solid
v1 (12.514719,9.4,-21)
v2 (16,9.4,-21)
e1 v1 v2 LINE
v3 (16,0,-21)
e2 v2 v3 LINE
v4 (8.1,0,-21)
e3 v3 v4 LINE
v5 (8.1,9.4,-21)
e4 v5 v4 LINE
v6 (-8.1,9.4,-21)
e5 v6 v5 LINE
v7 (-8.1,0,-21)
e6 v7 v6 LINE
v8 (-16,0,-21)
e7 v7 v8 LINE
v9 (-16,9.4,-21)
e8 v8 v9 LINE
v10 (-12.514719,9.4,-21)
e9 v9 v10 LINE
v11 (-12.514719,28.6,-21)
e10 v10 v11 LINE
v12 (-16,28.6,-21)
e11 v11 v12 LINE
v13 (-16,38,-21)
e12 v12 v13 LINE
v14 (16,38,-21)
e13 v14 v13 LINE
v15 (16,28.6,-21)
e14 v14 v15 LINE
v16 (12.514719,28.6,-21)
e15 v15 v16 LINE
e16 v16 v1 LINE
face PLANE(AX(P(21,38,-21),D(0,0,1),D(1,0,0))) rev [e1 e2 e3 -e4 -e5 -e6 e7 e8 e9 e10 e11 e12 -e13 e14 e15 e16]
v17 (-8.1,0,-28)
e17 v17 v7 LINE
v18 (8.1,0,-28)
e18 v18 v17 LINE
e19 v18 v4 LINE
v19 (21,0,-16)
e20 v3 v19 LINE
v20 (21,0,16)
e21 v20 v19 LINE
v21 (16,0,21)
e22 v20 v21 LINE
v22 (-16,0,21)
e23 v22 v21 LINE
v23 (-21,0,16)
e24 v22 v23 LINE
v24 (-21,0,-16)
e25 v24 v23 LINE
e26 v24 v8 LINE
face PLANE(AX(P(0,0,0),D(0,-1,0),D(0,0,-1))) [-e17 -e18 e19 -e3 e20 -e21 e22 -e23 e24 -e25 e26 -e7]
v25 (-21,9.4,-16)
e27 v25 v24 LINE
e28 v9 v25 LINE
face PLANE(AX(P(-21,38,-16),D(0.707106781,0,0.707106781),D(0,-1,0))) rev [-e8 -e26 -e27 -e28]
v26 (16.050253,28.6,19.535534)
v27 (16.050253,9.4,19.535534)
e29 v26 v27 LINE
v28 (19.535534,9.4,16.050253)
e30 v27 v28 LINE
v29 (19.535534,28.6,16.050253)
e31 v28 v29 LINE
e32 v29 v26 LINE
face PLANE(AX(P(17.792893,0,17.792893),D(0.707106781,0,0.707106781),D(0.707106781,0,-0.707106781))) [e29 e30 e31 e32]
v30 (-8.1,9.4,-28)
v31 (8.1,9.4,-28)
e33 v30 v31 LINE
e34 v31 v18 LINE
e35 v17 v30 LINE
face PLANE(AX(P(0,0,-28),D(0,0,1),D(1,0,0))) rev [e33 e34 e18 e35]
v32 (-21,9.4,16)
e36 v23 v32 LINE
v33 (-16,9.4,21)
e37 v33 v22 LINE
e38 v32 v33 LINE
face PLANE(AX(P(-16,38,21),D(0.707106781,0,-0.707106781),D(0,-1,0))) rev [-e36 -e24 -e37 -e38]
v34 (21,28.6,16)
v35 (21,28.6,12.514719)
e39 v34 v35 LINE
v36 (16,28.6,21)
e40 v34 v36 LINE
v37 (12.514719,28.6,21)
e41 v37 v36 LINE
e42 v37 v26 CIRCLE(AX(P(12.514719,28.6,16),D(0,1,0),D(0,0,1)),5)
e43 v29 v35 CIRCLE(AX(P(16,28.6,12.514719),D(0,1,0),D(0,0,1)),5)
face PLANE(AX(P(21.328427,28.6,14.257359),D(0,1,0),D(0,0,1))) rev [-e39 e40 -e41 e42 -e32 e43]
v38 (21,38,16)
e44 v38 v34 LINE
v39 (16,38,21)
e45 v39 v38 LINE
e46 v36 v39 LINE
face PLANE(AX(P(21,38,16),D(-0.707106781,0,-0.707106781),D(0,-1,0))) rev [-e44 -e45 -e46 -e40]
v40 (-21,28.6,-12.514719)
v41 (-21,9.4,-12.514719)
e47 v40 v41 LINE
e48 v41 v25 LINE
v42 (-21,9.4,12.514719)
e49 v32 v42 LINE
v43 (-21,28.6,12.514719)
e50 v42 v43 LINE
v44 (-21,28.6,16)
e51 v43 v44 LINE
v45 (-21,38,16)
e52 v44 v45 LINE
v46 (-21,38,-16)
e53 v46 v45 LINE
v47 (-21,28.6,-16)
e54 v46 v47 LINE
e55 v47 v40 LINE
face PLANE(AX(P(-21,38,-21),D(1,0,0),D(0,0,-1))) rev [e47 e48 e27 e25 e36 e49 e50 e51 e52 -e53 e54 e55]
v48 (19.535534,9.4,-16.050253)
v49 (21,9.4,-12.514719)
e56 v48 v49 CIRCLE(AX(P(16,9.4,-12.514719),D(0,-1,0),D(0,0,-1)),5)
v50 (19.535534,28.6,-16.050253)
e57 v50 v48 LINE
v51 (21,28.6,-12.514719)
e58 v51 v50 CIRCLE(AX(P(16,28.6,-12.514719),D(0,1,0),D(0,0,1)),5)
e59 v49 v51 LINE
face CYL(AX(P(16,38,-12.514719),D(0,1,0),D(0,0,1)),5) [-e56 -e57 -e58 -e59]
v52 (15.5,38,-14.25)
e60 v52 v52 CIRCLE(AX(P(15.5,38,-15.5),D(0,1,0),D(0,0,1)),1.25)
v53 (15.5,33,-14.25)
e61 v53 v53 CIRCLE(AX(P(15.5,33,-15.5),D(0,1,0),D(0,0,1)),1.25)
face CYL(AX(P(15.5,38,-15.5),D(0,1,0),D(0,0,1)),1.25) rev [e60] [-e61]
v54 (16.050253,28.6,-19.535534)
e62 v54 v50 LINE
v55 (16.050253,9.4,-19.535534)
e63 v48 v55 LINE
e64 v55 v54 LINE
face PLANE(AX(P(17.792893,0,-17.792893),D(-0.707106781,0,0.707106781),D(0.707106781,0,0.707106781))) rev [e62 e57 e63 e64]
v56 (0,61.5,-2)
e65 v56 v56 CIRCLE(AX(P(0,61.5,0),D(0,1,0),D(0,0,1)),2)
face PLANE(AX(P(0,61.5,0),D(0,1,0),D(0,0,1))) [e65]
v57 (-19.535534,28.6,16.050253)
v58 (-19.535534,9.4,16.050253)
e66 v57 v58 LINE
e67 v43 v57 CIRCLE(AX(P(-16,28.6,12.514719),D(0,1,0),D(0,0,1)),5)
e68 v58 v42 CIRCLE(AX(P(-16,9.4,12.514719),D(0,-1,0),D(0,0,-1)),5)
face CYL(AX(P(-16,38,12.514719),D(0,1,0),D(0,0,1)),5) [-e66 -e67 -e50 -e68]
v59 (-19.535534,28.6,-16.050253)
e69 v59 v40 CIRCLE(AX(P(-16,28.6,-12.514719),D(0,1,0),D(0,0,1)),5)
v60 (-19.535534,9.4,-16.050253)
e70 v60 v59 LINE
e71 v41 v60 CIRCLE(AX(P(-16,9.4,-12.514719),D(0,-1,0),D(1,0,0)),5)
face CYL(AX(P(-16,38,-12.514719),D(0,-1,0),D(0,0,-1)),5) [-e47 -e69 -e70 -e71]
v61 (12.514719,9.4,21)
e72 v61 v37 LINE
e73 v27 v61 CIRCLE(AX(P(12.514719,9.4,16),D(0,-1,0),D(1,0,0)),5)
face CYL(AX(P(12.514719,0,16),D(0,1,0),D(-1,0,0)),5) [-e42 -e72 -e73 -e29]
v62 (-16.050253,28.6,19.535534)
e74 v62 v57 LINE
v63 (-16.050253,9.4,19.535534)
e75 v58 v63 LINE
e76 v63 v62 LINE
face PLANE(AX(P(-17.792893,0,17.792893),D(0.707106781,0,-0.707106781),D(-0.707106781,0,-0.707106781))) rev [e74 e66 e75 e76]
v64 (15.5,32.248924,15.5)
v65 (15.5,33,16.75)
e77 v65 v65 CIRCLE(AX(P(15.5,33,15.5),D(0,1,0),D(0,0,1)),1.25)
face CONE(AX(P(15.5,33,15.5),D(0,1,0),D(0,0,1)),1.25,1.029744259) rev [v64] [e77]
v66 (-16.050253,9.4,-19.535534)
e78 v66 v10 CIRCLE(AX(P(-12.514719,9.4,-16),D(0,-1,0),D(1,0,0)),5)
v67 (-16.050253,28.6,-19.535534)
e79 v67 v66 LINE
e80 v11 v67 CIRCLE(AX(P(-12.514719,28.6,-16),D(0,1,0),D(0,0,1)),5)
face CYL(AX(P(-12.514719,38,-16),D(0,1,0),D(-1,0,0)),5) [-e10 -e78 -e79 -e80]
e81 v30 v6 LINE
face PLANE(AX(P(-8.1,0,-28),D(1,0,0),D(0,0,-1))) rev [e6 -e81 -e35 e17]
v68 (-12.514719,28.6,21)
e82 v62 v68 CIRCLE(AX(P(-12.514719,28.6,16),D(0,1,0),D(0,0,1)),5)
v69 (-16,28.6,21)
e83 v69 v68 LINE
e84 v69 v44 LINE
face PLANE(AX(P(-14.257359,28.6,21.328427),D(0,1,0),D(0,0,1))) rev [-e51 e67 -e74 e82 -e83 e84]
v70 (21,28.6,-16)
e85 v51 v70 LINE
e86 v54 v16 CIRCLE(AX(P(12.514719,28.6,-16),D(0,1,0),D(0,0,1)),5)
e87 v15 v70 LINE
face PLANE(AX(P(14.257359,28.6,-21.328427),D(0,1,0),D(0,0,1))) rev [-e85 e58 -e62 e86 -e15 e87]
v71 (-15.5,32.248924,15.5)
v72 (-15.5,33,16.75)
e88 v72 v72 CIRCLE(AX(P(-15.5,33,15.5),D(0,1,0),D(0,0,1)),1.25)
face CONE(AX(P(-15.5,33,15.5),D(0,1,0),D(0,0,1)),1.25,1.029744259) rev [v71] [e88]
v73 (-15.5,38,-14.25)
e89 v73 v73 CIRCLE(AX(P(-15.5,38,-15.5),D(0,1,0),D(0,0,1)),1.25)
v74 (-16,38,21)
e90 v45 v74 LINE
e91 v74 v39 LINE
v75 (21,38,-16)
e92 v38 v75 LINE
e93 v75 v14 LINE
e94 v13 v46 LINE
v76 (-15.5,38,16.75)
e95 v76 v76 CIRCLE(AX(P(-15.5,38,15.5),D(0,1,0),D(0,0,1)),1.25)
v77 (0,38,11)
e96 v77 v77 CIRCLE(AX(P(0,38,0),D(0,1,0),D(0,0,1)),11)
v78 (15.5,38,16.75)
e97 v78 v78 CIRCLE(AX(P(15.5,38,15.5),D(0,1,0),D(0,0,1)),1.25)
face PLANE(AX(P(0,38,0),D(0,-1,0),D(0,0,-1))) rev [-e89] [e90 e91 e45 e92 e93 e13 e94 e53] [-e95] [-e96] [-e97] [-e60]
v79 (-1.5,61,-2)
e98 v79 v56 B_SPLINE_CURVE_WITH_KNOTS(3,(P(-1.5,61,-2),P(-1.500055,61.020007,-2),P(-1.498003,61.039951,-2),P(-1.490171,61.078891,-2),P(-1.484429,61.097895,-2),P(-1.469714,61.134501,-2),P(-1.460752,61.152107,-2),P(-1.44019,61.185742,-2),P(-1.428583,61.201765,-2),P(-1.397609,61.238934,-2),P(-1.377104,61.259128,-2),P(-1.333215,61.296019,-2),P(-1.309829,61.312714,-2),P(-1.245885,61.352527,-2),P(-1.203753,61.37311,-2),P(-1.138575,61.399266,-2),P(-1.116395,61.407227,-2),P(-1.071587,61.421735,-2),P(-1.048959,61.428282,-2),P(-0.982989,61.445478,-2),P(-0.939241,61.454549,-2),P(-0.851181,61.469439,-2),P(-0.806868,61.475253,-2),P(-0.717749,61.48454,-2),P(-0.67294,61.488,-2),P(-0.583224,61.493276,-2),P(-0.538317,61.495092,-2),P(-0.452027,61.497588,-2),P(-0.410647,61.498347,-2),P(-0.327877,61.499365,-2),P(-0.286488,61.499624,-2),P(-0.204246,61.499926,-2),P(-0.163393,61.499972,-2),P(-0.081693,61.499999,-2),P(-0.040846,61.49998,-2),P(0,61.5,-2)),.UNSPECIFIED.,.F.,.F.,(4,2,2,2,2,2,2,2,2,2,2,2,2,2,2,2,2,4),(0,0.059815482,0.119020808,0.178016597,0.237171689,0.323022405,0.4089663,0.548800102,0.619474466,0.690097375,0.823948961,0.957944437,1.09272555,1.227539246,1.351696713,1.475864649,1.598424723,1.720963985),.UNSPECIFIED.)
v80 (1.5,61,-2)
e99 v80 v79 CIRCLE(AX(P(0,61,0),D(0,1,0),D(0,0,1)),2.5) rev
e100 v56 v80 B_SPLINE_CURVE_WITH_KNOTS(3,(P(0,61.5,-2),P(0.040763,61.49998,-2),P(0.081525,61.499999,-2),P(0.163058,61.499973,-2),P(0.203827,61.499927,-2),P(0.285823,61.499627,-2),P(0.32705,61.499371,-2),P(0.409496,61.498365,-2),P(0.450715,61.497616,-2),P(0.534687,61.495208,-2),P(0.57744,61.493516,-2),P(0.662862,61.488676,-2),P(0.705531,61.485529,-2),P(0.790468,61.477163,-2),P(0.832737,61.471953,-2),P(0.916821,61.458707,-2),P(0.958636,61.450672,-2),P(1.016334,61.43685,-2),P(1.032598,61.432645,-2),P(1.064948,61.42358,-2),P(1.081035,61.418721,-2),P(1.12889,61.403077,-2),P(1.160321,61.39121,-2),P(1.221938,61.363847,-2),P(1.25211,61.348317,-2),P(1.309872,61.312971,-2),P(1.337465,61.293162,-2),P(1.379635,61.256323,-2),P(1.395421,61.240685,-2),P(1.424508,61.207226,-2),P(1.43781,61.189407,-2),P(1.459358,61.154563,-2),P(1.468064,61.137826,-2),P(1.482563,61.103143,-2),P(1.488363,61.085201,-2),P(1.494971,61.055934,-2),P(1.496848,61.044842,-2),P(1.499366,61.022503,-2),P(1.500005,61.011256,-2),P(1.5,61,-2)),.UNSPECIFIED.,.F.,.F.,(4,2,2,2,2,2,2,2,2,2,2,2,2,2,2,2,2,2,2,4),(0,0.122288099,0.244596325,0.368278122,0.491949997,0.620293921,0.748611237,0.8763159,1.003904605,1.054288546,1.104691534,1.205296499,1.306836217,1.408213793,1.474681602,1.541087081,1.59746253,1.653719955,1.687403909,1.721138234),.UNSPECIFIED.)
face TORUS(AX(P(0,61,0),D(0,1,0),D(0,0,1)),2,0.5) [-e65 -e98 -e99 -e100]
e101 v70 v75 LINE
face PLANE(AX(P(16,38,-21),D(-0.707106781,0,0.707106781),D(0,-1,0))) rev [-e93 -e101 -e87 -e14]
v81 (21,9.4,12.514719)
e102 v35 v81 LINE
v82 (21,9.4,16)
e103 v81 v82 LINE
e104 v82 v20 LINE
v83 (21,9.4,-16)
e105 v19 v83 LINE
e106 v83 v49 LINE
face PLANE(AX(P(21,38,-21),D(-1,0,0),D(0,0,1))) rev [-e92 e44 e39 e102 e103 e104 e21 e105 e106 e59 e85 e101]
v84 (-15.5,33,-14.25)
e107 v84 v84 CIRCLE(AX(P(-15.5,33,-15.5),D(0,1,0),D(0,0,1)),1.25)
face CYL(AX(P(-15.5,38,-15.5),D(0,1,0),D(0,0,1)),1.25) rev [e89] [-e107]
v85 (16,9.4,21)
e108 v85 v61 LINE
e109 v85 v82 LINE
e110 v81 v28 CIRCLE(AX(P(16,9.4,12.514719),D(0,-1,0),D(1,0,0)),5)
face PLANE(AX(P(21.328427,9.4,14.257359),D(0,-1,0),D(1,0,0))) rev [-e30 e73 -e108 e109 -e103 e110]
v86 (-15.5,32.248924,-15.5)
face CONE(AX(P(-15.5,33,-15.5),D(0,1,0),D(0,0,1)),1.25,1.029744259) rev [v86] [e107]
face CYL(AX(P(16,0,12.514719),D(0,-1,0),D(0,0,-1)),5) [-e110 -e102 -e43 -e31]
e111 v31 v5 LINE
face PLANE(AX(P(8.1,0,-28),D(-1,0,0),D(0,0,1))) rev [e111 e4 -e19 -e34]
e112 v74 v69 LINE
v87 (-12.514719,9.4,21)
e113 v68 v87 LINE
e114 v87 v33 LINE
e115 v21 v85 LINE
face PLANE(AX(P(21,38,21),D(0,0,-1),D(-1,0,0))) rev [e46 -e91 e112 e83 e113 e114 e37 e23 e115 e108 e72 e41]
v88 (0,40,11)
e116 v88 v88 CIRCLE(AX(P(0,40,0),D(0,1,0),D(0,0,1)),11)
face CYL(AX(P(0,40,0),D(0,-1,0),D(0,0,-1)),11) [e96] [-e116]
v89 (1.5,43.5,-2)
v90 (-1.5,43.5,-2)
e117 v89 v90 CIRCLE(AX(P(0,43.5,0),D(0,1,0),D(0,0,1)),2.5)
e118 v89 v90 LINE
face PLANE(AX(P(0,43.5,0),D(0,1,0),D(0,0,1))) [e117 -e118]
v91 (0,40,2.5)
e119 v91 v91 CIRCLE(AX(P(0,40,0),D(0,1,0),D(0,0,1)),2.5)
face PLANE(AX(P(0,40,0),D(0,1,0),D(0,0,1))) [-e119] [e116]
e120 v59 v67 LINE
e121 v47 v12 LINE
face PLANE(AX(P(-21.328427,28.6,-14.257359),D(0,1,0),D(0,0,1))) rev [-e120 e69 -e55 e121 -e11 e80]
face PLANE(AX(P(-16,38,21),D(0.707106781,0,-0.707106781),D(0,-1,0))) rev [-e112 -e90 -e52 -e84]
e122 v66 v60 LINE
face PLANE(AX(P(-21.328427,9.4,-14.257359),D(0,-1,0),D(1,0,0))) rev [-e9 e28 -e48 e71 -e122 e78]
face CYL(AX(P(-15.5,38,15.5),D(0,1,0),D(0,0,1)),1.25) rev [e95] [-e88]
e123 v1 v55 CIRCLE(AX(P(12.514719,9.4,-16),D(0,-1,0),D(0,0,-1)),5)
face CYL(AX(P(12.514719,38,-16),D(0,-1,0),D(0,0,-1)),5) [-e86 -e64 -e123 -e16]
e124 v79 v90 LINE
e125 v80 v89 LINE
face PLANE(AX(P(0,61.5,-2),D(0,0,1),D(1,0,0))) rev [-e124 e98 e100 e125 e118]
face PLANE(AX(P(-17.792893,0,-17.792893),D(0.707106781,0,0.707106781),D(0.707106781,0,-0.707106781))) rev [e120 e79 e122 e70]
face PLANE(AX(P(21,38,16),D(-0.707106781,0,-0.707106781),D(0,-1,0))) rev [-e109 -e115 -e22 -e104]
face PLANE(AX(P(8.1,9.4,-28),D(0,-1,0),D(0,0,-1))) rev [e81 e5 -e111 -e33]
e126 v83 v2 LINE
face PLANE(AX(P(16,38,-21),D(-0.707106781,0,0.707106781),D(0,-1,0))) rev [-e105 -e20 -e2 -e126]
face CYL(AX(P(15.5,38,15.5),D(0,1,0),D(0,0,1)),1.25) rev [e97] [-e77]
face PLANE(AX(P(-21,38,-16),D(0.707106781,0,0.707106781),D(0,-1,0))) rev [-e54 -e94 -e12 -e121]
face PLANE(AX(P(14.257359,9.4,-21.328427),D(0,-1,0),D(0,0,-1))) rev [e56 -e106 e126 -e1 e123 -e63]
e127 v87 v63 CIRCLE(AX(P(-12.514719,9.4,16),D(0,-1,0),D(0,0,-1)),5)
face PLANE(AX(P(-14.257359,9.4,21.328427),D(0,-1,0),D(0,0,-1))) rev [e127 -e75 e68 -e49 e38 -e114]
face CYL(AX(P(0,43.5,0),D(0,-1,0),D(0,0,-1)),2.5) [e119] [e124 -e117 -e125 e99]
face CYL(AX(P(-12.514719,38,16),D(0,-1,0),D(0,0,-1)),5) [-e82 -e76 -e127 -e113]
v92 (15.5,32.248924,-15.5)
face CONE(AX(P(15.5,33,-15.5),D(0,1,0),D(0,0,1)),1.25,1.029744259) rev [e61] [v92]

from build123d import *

# Parameters (mm, degrees)
SKETCH1_W             = 42
SKETCH1_H             = 42
BOSS_EXTRUDE1_DEPTH   = 38
SKETCH2_R             = 11
BOSS_EXTRUDE2_DEPTH   = 2
SKETCH3_R             = 2.5
BOSS_EXTRUDE3_DEPTH   = 3.5
BOSS_EXTRUDE4_DEPTH   = 18
M3_TAPPED_HOLE1_D     = 2.5
M3_TAPPED_HOLE1_DEPTH = 5
M3_TAPPED_HOLE1_TIP   = 0.751075774
CHAMFER1_SIZE         = 5
SKETCH11_W            = 10
SKETCH11_H            = 19.2
CUT_EXTRUDE2_DEPTH    = 1
SKETCH12_W            = 10
SKETCH12_H            = 19.2
CUT_EXTRUDE3_DEPTH    = 1
SKETCH13_W            = 10
SKETCH13_H            = 19.2
CUT_EXTRUDE4_DEPTH    = 1
SKETCH14_W            = 10
SKETCH14_H            = 19.2
CUT_EXTRUDE5_DEPTH    = 1
FILLET1_R             = 5
SKETCH15_W            = 16.2
SKETCH15_H            = 9.4
BOSS_EXTRUDE5_DEPTH   = 7
FILLET3_R             = 0.5


with BuildPart() as part:
    # Sketch1 → Boss-Extrude1 (new body)
    with BuildSketch(Plane(origin=(0, 0, 0), x_dir=(1, 0, 0), z_dir=(0, 1, 0))):
        Rectangle(SKETCH1_W, SKETCH1_H)
    extrude(amount=BOSS_EXTRUDE1_DEPTH)

    # Sketch2 → Boss-Extrude2 (add)
    with BuildSketch(Plane(origin=(0, 38, 0), x_dir=(1, 0, 0), z_dir=(0, 1, 0))):
        with Locations(Location((0, 0, 0), (0, 0, 270))):
            Circle(SKETCH2_R)
    extrude(amount=BOSS_EXTRUDE2_DEPTH)

    # Sketch3 → Boss-Extrude3 (add)
    with BuildSketch(Plane(origin=(0, 40, 0), x_dir=(1, 0, 0), z_dir=(0, 1, 0))):
        with Locations(Location((0, 0, 0), (0, 0, 270))):
            Circle(SKETCH3_R)
    extrude(amount=BOSS_EXTRUDE3_DEPTH)

    # Sketch4 → Boss-Extrude4 (add)
    with BuildSketch(Plane(origin=(0, 43.5, 0), x_dir=(1, 0, 0), z_dir=(0, 1, 0))):
        with BuildLine():
            ThreePointArc((-1.5, 2), (-2.371708245, -0.790569415), (0, -2.5))
            Line((0, -2.5), (0, 2))
            Line((0, 2), (-1.5, 2))
        make_face()
        with BuildLine():
            Line((0, 2), (0, -2.5))
            ThreePointArc((0, -2.5), (1.767766953, -1.767766953), (2.5, 0))
            ThreePointArc((2.5, 0), (2.236067977, 1.118033989), (1.5, 2))
            Line((1.5, 2), (0, 2))
        make_face()
    extrude(amount=BOSS_EXTRUDE4_DEPTH)

    # M3 Tapped Hole1
    with Locations(Plane(origin=(0, 38, 0), x_dir=(1, 0, 0), z_dir=(0, 1, 0))):
        with Locations((-15.5, 15.5), (15.5, 15.5), (15.5, -15.5), (-15.5, -15.5)):
            Hole(M3_TAPPED_HOLE1_D / 2, depth=M3_TAPPED_HOLE1_DEPTH)
            with Locations((0, 0, -(M3_TAPPED_HOLE1_DEPTH + M3_TAPPED_HOLE1_TIP / 2))):  # 118° drill point
                Cone(0, M3_TAPPED_HOLE1_D / 2, M3_TAPPED_HOLE1_TIP, mode=Mode.SUBTRACT)

    # Chamfer1
    chamfer1_edges = [part.edges().sort_by_distance(p)[0] for p in [
        (-21, 19, -21),
        (21, 19, -21),
        (21, 19, 21),
        (-21, 19, 21),
    ]]
    chamfer(chamfer1_edges, length=CHAMFER1_SIZE)

    # Sketch11 → Cut-Extrude2 (cut)
    with BuildSketch(Plane(origin=(18.5, 0, 18.5), x_dir=(0.7071067811865485, 0, -0.7071067811865467), z_dir=(0.7071067811865467, 0, 0.7071067811865485))):
        with Locations((0, 19)):
            Rectangle(SKETCH11_W, SKETCH11_H)
    extrude(amount=-CUT_EXTRUDE2_DEPTH, mode=Mode.SUBTRACT)

    # Sketch12 → Cut-Extrude3 (cut)
    with BuildSketch(Plane(origin=(-18.5, 0, 18.5), x_dir=(0.7071067811865465, 0, 0.7071067811865487), z_dir=(-0.7071067811865487, 0, 0.7071067811865465))):
        with Locations((0, 19)):
            Rectangle(SKETCH12_W, SKETCH12_H)
    extrude(amount=-CUT_EXTRUDE3_DEPTH, mode=Mode.SUBTRACT)

    # Sketch13 → Cut-Extrude4 (cut)
    with BuildSketch(Plane(origin=(-18.5, 0, -18.5), x_dir=(-0.7071067811865485, 0, 0.7071067811865467), z_dir=(-0.7071067811865467, 0, -0.7071067811865485))):
        with Locations((0, 19)):
            Rectangle(SKETCH13_W, SKETCH13_H)
    extrude(amount=-CUT_EXTRUDE4_DEPTH, mode=Mode.SUBTRACT)

    # Sketch14 → Cut-Extrude5 (cut)
    with BuildSketch(Plane(origin=(18.5, 0, -18.5), x_dir=(-0.7071067811865467, 0, -0.7071067811865485), z_dir=(0.7071067811865485, 0, -0.7071067811865467))):
        with Locations((0, 19)):
            Rectangle(SKETCH14_W, SKETCH14_H)
    extrude(amount=-CUT_EXTRUDE5_DEPTH, mode=Mode.SUBTRACT)

    # Fillet1
    fillet1_edges = [part.edges().sort_by_distance(p)[0] for p in [
        (-14.585786438, 19, 21),
        (-21, 19, 14.585786438),
        (-14.585786438, 19, -21),
        (-21, 19, -14.585786438),
        (14.585786438, 19, -21),
        (21, 19, -14.585786438),
        (21, 19, 14.585786438),
        (14.585786438, 19, 21),
    ]]
    fillet(fillet1_edges, radius=FILLET1_R)

    # Sketch15 → Boss-Extrude5 (add)
    with BuildSketch(Plane(origin=(0, 0, -21), x_dir=(-1, 0, 0), z_dir=(0, 0, -1))):
        with Locations((0, 4.7)):
            Rectangle(SKETCH15_W, SKETCH15_H)
    extrude(amount=BOSS_EXTRUDE5_DEPTH)

    # Fillet3
    # the kernel refuses this fillet: 0.5 mm, written as the material it takes off along each edge
    with BuildSketch(Plane(origin=(0, 61.5, 0), x_dir=(0.14099255813885567, 0, -0.990010655775715), z_dir=(-0.990010655775715, 0, -0.14099255813885567))) as fillet3_piece_1:
        with BuildLine():
            CenterArc((2.5 - FILLET3_R, FILLET3_R), FILLET3_R, 270, 90)
            Line((2.5 - FILLET3_R, 0), (2.5, 0))
            Line((2.5, 0), (2.5, FILLET3_R))
        make_face()
    revolve(axis=Axis((0, 61.5, 0), (0, -1, 0)), revolution_arc=343.789429262, mode=Mode.SUBTRACT)


solid = part.part
